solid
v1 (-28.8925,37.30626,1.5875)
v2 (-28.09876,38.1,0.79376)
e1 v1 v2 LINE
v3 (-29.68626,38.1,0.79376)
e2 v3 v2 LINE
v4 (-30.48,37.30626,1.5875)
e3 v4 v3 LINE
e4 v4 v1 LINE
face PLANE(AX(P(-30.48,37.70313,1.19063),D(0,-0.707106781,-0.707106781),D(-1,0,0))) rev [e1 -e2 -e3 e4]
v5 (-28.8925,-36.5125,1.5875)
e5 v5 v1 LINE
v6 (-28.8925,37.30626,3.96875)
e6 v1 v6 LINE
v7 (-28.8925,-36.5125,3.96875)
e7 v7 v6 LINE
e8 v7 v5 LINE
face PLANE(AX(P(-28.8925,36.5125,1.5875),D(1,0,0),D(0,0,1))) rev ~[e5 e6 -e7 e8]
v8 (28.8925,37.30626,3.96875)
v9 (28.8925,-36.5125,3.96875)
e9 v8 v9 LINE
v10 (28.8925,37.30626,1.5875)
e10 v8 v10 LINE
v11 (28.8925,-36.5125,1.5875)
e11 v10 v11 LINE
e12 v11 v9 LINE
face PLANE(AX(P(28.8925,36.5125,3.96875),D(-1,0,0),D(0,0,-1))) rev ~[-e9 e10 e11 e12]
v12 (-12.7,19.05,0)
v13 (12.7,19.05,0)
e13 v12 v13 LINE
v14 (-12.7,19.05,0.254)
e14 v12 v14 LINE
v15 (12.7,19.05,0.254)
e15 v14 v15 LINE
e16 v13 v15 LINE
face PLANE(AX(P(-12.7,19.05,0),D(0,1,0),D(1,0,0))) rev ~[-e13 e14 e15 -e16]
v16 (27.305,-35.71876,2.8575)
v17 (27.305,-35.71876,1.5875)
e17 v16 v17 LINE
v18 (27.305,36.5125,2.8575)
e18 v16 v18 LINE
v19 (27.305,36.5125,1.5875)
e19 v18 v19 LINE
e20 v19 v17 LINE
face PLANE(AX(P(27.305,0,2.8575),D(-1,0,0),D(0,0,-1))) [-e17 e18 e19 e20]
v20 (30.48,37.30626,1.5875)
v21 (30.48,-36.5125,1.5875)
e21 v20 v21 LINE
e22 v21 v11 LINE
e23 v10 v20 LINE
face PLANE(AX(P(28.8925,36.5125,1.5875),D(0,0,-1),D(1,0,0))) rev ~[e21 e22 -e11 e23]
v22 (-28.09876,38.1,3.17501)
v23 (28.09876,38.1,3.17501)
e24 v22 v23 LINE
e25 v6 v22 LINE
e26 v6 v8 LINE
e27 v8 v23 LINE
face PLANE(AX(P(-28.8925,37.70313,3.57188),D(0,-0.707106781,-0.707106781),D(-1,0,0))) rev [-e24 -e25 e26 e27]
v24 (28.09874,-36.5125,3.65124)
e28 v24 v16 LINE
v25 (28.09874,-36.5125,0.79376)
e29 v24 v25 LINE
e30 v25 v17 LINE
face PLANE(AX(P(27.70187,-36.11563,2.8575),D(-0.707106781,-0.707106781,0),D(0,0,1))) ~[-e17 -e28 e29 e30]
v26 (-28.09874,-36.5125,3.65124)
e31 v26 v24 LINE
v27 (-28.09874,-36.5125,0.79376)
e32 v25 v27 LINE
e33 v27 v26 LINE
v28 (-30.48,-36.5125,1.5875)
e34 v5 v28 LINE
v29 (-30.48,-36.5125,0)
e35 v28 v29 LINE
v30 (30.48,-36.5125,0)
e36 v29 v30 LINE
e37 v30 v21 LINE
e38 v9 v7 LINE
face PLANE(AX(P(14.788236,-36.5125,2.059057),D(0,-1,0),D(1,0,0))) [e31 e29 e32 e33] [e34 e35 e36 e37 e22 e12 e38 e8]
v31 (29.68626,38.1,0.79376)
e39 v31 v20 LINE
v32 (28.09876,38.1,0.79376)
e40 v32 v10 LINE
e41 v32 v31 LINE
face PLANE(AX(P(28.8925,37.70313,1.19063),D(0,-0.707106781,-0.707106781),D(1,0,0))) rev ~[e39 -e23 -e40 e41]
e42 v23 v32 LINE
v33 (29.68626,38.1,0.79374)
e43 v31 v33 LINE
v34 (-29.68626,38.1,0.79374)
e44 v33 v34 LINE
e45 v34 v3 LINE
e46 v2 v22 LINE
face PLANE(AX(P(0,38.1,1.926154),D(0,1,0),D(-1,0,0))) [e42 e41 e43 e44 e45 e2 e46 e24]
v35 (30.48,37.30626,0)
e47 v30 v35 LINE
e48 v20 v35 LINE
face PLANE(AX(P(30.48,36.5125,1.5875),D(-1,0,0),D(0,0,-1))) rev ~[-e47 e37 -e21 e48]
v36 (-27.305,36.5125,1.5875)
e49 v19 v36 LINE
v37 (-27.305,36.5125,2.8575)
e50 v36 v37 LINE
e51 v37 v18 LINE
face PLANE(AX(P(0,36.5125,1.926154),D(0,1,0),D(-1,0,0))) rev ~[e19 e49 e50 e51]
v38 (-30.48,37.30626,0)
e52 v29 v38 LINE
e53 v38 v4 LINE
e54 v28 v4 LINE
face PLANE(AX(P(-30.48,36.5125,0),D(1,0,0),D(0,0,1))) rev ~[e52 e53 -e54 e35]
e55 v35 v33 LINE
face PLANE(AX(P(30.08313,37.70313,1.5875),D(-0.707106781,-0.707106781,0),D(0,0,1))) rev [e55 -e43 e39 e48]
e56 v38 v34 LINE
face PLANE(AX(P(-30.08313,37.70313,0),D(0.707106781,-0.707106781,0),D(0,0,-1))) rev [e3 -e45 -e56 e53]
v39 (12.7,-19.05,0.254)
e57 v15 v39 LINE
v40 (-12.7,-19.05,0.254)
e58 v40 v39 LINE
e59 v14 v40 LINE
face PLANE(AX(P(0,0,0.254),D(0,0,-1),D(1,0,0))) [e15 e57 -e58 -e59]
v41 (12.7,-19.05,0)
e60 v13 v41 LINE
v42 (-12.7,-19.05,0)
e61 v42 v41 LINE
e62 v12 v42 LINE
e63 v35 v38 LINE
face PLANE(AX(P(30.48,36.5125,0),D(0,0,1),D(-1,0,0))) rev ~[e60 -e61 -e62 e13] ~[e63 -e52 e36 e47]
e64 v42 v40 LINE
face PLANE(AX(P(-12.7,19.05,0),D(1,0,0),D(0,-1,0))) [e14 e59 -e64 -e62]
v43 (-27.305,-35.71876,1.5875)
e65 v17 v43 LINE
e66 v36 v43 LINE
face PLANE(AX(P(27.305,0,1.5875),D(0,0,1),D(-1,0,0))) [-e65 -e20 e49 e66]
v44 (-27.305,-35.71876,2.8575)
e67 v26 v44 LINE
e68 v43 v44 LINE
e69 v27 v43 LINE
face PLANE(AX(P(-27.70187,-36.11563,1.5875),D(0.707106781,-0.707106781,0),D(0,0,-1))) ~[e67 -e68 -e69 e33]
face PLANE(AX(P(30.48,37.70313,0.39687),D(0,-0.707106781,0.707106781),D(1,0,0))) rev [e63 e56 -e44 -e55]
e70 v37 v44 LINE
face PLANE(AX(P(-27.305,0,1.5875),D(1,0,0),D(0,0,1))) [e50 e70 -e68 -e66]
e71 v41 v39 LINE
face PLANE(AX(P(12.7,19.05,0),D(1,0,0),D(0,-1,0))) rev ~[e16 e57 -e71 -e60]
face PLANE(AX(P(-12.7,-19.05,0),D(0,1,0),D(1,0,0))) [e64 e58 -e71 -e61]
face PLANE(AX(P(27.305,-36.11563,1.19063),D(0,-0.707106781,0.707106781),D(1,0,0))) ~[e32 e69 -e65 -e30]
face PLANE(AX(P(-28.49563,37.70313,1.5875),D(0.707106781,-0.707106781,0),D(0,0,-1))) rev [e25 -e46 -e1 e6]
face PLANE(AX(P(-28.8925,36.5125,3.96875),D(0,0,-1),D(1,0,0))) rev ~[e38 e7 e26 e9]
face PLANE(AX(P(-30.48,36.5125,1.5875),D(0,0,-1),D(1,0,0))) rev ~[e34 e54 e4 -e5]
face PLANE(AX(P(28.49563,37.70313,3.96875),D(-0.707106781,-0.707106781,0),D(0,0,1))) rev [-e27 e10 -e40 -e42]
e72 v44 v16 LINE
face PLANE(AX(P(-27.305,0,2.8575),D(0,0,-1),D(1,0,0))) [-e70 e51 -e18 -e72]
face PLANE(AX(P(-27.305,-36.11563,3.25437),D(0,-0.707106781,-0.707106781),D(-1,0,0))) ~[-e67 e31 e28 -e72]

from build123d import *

# Parameters (mm, degrees)
F1_DEPTH = 36.5125
F2_W     = 54.61
F2_H     = 1.27
F3_DEPTH = 1.5875
F4_SIZE  = 0.79374
F5_W     = 25.4
F5_H     = 38.1
F6_DEPTH = 0.254


# Not quite as in the source:
# - a fillet or chamfer is up to 0.001 mm smaller than in the source, because OpenCascade refuses the exact size


with BuildPart() as f1:
    # F0 (on Front) → F1 (new body, symmetric)
    with BuildSketch(Plane.XZ):
        Polygon((27.305, 0), (30.48, 0), (30.48, 1.5875), (28.8925, 1.5875), (28.8925, 3.96875), (0, 3.96875), (0, 2.8575), (27.305, 2.8575), (27.305, 1.5875), (0, 1.5875), (0, 0), align=None)
        Polygon((-27.305, 0), (0, 0), (0, 1.5875), (-27.305, 1.5875), (-27.305, 2.8575), (0, 2.8575), (0, 3.96875), (-28.8925, 3.96875), (-28.8925, 1.5875), (-30.48, 1.5875), (-30.48, 0), align=None)
    extrude(amount=F1_DEPTH, both=True)

    # F2 (on face) → F3 (join)
    with BuildSketch(Plane(origin=(0, 36.5125, 0), x_dir=(-1, 0, 0), z_dir=(0, 1, 0))):
        Polygon((-30.48, 1.5875), (-30.48, 0), (30.48, 0), (30.48, 1.5875), (28.8925, 1.5875), (28.8925, 3.96875), (-28.8925, 3.96875), (-28.8925, 1.5875), align=None)
        with Locations((0, 2.2225)):
            Rectangle(F2_W, F2_H, mode=Mode.SUBTRACT)
        with Locations((0, 2.2225)):
            Rectangle(F2_W, F2_H)
    extrude(amount=F3_DEPTH)

    # F4 (size 0.79375 in the source; OpenCascade refuses exactly that, so slightly less here)
    f4_edges = [f1.edges().sort_by_distance(p)[0] for p in [
        (27.305, -36.5125, 2.2225),
        (0, -36.5125, 1.5875),
        (0, -36.5125, 2.8575),
        (-27.305, -36.5125, 2.2225),
        (29.68625, 38.1, 1.5875),
        (28.8925, 38.1, 2.778125),
        (0, 38.1, 3.96875),
        (0, 38.1, 0),
        (30.48, 38.1, 0.79375),
        (-28.8925, 38.1, 2.778125),
        (-29.68625, 38.1, 1.5875),
        (-30.48, 38.1, 0.79375),
    ]]
    chamfer(f4_edges, length=F4_SIZE)

    # F5 (on face) → F6 (cut)
    with BuildSketch(Plane(origin=(0, 0, 0), x_dir=(1, 0, 0), z_dir=(0, 0, -1))):
        Rectangle(F5_W, F5_H)
    extrude(amount=-F6_DEPTH, mode=Mode.SUBTRACT)


solid = f1.part
